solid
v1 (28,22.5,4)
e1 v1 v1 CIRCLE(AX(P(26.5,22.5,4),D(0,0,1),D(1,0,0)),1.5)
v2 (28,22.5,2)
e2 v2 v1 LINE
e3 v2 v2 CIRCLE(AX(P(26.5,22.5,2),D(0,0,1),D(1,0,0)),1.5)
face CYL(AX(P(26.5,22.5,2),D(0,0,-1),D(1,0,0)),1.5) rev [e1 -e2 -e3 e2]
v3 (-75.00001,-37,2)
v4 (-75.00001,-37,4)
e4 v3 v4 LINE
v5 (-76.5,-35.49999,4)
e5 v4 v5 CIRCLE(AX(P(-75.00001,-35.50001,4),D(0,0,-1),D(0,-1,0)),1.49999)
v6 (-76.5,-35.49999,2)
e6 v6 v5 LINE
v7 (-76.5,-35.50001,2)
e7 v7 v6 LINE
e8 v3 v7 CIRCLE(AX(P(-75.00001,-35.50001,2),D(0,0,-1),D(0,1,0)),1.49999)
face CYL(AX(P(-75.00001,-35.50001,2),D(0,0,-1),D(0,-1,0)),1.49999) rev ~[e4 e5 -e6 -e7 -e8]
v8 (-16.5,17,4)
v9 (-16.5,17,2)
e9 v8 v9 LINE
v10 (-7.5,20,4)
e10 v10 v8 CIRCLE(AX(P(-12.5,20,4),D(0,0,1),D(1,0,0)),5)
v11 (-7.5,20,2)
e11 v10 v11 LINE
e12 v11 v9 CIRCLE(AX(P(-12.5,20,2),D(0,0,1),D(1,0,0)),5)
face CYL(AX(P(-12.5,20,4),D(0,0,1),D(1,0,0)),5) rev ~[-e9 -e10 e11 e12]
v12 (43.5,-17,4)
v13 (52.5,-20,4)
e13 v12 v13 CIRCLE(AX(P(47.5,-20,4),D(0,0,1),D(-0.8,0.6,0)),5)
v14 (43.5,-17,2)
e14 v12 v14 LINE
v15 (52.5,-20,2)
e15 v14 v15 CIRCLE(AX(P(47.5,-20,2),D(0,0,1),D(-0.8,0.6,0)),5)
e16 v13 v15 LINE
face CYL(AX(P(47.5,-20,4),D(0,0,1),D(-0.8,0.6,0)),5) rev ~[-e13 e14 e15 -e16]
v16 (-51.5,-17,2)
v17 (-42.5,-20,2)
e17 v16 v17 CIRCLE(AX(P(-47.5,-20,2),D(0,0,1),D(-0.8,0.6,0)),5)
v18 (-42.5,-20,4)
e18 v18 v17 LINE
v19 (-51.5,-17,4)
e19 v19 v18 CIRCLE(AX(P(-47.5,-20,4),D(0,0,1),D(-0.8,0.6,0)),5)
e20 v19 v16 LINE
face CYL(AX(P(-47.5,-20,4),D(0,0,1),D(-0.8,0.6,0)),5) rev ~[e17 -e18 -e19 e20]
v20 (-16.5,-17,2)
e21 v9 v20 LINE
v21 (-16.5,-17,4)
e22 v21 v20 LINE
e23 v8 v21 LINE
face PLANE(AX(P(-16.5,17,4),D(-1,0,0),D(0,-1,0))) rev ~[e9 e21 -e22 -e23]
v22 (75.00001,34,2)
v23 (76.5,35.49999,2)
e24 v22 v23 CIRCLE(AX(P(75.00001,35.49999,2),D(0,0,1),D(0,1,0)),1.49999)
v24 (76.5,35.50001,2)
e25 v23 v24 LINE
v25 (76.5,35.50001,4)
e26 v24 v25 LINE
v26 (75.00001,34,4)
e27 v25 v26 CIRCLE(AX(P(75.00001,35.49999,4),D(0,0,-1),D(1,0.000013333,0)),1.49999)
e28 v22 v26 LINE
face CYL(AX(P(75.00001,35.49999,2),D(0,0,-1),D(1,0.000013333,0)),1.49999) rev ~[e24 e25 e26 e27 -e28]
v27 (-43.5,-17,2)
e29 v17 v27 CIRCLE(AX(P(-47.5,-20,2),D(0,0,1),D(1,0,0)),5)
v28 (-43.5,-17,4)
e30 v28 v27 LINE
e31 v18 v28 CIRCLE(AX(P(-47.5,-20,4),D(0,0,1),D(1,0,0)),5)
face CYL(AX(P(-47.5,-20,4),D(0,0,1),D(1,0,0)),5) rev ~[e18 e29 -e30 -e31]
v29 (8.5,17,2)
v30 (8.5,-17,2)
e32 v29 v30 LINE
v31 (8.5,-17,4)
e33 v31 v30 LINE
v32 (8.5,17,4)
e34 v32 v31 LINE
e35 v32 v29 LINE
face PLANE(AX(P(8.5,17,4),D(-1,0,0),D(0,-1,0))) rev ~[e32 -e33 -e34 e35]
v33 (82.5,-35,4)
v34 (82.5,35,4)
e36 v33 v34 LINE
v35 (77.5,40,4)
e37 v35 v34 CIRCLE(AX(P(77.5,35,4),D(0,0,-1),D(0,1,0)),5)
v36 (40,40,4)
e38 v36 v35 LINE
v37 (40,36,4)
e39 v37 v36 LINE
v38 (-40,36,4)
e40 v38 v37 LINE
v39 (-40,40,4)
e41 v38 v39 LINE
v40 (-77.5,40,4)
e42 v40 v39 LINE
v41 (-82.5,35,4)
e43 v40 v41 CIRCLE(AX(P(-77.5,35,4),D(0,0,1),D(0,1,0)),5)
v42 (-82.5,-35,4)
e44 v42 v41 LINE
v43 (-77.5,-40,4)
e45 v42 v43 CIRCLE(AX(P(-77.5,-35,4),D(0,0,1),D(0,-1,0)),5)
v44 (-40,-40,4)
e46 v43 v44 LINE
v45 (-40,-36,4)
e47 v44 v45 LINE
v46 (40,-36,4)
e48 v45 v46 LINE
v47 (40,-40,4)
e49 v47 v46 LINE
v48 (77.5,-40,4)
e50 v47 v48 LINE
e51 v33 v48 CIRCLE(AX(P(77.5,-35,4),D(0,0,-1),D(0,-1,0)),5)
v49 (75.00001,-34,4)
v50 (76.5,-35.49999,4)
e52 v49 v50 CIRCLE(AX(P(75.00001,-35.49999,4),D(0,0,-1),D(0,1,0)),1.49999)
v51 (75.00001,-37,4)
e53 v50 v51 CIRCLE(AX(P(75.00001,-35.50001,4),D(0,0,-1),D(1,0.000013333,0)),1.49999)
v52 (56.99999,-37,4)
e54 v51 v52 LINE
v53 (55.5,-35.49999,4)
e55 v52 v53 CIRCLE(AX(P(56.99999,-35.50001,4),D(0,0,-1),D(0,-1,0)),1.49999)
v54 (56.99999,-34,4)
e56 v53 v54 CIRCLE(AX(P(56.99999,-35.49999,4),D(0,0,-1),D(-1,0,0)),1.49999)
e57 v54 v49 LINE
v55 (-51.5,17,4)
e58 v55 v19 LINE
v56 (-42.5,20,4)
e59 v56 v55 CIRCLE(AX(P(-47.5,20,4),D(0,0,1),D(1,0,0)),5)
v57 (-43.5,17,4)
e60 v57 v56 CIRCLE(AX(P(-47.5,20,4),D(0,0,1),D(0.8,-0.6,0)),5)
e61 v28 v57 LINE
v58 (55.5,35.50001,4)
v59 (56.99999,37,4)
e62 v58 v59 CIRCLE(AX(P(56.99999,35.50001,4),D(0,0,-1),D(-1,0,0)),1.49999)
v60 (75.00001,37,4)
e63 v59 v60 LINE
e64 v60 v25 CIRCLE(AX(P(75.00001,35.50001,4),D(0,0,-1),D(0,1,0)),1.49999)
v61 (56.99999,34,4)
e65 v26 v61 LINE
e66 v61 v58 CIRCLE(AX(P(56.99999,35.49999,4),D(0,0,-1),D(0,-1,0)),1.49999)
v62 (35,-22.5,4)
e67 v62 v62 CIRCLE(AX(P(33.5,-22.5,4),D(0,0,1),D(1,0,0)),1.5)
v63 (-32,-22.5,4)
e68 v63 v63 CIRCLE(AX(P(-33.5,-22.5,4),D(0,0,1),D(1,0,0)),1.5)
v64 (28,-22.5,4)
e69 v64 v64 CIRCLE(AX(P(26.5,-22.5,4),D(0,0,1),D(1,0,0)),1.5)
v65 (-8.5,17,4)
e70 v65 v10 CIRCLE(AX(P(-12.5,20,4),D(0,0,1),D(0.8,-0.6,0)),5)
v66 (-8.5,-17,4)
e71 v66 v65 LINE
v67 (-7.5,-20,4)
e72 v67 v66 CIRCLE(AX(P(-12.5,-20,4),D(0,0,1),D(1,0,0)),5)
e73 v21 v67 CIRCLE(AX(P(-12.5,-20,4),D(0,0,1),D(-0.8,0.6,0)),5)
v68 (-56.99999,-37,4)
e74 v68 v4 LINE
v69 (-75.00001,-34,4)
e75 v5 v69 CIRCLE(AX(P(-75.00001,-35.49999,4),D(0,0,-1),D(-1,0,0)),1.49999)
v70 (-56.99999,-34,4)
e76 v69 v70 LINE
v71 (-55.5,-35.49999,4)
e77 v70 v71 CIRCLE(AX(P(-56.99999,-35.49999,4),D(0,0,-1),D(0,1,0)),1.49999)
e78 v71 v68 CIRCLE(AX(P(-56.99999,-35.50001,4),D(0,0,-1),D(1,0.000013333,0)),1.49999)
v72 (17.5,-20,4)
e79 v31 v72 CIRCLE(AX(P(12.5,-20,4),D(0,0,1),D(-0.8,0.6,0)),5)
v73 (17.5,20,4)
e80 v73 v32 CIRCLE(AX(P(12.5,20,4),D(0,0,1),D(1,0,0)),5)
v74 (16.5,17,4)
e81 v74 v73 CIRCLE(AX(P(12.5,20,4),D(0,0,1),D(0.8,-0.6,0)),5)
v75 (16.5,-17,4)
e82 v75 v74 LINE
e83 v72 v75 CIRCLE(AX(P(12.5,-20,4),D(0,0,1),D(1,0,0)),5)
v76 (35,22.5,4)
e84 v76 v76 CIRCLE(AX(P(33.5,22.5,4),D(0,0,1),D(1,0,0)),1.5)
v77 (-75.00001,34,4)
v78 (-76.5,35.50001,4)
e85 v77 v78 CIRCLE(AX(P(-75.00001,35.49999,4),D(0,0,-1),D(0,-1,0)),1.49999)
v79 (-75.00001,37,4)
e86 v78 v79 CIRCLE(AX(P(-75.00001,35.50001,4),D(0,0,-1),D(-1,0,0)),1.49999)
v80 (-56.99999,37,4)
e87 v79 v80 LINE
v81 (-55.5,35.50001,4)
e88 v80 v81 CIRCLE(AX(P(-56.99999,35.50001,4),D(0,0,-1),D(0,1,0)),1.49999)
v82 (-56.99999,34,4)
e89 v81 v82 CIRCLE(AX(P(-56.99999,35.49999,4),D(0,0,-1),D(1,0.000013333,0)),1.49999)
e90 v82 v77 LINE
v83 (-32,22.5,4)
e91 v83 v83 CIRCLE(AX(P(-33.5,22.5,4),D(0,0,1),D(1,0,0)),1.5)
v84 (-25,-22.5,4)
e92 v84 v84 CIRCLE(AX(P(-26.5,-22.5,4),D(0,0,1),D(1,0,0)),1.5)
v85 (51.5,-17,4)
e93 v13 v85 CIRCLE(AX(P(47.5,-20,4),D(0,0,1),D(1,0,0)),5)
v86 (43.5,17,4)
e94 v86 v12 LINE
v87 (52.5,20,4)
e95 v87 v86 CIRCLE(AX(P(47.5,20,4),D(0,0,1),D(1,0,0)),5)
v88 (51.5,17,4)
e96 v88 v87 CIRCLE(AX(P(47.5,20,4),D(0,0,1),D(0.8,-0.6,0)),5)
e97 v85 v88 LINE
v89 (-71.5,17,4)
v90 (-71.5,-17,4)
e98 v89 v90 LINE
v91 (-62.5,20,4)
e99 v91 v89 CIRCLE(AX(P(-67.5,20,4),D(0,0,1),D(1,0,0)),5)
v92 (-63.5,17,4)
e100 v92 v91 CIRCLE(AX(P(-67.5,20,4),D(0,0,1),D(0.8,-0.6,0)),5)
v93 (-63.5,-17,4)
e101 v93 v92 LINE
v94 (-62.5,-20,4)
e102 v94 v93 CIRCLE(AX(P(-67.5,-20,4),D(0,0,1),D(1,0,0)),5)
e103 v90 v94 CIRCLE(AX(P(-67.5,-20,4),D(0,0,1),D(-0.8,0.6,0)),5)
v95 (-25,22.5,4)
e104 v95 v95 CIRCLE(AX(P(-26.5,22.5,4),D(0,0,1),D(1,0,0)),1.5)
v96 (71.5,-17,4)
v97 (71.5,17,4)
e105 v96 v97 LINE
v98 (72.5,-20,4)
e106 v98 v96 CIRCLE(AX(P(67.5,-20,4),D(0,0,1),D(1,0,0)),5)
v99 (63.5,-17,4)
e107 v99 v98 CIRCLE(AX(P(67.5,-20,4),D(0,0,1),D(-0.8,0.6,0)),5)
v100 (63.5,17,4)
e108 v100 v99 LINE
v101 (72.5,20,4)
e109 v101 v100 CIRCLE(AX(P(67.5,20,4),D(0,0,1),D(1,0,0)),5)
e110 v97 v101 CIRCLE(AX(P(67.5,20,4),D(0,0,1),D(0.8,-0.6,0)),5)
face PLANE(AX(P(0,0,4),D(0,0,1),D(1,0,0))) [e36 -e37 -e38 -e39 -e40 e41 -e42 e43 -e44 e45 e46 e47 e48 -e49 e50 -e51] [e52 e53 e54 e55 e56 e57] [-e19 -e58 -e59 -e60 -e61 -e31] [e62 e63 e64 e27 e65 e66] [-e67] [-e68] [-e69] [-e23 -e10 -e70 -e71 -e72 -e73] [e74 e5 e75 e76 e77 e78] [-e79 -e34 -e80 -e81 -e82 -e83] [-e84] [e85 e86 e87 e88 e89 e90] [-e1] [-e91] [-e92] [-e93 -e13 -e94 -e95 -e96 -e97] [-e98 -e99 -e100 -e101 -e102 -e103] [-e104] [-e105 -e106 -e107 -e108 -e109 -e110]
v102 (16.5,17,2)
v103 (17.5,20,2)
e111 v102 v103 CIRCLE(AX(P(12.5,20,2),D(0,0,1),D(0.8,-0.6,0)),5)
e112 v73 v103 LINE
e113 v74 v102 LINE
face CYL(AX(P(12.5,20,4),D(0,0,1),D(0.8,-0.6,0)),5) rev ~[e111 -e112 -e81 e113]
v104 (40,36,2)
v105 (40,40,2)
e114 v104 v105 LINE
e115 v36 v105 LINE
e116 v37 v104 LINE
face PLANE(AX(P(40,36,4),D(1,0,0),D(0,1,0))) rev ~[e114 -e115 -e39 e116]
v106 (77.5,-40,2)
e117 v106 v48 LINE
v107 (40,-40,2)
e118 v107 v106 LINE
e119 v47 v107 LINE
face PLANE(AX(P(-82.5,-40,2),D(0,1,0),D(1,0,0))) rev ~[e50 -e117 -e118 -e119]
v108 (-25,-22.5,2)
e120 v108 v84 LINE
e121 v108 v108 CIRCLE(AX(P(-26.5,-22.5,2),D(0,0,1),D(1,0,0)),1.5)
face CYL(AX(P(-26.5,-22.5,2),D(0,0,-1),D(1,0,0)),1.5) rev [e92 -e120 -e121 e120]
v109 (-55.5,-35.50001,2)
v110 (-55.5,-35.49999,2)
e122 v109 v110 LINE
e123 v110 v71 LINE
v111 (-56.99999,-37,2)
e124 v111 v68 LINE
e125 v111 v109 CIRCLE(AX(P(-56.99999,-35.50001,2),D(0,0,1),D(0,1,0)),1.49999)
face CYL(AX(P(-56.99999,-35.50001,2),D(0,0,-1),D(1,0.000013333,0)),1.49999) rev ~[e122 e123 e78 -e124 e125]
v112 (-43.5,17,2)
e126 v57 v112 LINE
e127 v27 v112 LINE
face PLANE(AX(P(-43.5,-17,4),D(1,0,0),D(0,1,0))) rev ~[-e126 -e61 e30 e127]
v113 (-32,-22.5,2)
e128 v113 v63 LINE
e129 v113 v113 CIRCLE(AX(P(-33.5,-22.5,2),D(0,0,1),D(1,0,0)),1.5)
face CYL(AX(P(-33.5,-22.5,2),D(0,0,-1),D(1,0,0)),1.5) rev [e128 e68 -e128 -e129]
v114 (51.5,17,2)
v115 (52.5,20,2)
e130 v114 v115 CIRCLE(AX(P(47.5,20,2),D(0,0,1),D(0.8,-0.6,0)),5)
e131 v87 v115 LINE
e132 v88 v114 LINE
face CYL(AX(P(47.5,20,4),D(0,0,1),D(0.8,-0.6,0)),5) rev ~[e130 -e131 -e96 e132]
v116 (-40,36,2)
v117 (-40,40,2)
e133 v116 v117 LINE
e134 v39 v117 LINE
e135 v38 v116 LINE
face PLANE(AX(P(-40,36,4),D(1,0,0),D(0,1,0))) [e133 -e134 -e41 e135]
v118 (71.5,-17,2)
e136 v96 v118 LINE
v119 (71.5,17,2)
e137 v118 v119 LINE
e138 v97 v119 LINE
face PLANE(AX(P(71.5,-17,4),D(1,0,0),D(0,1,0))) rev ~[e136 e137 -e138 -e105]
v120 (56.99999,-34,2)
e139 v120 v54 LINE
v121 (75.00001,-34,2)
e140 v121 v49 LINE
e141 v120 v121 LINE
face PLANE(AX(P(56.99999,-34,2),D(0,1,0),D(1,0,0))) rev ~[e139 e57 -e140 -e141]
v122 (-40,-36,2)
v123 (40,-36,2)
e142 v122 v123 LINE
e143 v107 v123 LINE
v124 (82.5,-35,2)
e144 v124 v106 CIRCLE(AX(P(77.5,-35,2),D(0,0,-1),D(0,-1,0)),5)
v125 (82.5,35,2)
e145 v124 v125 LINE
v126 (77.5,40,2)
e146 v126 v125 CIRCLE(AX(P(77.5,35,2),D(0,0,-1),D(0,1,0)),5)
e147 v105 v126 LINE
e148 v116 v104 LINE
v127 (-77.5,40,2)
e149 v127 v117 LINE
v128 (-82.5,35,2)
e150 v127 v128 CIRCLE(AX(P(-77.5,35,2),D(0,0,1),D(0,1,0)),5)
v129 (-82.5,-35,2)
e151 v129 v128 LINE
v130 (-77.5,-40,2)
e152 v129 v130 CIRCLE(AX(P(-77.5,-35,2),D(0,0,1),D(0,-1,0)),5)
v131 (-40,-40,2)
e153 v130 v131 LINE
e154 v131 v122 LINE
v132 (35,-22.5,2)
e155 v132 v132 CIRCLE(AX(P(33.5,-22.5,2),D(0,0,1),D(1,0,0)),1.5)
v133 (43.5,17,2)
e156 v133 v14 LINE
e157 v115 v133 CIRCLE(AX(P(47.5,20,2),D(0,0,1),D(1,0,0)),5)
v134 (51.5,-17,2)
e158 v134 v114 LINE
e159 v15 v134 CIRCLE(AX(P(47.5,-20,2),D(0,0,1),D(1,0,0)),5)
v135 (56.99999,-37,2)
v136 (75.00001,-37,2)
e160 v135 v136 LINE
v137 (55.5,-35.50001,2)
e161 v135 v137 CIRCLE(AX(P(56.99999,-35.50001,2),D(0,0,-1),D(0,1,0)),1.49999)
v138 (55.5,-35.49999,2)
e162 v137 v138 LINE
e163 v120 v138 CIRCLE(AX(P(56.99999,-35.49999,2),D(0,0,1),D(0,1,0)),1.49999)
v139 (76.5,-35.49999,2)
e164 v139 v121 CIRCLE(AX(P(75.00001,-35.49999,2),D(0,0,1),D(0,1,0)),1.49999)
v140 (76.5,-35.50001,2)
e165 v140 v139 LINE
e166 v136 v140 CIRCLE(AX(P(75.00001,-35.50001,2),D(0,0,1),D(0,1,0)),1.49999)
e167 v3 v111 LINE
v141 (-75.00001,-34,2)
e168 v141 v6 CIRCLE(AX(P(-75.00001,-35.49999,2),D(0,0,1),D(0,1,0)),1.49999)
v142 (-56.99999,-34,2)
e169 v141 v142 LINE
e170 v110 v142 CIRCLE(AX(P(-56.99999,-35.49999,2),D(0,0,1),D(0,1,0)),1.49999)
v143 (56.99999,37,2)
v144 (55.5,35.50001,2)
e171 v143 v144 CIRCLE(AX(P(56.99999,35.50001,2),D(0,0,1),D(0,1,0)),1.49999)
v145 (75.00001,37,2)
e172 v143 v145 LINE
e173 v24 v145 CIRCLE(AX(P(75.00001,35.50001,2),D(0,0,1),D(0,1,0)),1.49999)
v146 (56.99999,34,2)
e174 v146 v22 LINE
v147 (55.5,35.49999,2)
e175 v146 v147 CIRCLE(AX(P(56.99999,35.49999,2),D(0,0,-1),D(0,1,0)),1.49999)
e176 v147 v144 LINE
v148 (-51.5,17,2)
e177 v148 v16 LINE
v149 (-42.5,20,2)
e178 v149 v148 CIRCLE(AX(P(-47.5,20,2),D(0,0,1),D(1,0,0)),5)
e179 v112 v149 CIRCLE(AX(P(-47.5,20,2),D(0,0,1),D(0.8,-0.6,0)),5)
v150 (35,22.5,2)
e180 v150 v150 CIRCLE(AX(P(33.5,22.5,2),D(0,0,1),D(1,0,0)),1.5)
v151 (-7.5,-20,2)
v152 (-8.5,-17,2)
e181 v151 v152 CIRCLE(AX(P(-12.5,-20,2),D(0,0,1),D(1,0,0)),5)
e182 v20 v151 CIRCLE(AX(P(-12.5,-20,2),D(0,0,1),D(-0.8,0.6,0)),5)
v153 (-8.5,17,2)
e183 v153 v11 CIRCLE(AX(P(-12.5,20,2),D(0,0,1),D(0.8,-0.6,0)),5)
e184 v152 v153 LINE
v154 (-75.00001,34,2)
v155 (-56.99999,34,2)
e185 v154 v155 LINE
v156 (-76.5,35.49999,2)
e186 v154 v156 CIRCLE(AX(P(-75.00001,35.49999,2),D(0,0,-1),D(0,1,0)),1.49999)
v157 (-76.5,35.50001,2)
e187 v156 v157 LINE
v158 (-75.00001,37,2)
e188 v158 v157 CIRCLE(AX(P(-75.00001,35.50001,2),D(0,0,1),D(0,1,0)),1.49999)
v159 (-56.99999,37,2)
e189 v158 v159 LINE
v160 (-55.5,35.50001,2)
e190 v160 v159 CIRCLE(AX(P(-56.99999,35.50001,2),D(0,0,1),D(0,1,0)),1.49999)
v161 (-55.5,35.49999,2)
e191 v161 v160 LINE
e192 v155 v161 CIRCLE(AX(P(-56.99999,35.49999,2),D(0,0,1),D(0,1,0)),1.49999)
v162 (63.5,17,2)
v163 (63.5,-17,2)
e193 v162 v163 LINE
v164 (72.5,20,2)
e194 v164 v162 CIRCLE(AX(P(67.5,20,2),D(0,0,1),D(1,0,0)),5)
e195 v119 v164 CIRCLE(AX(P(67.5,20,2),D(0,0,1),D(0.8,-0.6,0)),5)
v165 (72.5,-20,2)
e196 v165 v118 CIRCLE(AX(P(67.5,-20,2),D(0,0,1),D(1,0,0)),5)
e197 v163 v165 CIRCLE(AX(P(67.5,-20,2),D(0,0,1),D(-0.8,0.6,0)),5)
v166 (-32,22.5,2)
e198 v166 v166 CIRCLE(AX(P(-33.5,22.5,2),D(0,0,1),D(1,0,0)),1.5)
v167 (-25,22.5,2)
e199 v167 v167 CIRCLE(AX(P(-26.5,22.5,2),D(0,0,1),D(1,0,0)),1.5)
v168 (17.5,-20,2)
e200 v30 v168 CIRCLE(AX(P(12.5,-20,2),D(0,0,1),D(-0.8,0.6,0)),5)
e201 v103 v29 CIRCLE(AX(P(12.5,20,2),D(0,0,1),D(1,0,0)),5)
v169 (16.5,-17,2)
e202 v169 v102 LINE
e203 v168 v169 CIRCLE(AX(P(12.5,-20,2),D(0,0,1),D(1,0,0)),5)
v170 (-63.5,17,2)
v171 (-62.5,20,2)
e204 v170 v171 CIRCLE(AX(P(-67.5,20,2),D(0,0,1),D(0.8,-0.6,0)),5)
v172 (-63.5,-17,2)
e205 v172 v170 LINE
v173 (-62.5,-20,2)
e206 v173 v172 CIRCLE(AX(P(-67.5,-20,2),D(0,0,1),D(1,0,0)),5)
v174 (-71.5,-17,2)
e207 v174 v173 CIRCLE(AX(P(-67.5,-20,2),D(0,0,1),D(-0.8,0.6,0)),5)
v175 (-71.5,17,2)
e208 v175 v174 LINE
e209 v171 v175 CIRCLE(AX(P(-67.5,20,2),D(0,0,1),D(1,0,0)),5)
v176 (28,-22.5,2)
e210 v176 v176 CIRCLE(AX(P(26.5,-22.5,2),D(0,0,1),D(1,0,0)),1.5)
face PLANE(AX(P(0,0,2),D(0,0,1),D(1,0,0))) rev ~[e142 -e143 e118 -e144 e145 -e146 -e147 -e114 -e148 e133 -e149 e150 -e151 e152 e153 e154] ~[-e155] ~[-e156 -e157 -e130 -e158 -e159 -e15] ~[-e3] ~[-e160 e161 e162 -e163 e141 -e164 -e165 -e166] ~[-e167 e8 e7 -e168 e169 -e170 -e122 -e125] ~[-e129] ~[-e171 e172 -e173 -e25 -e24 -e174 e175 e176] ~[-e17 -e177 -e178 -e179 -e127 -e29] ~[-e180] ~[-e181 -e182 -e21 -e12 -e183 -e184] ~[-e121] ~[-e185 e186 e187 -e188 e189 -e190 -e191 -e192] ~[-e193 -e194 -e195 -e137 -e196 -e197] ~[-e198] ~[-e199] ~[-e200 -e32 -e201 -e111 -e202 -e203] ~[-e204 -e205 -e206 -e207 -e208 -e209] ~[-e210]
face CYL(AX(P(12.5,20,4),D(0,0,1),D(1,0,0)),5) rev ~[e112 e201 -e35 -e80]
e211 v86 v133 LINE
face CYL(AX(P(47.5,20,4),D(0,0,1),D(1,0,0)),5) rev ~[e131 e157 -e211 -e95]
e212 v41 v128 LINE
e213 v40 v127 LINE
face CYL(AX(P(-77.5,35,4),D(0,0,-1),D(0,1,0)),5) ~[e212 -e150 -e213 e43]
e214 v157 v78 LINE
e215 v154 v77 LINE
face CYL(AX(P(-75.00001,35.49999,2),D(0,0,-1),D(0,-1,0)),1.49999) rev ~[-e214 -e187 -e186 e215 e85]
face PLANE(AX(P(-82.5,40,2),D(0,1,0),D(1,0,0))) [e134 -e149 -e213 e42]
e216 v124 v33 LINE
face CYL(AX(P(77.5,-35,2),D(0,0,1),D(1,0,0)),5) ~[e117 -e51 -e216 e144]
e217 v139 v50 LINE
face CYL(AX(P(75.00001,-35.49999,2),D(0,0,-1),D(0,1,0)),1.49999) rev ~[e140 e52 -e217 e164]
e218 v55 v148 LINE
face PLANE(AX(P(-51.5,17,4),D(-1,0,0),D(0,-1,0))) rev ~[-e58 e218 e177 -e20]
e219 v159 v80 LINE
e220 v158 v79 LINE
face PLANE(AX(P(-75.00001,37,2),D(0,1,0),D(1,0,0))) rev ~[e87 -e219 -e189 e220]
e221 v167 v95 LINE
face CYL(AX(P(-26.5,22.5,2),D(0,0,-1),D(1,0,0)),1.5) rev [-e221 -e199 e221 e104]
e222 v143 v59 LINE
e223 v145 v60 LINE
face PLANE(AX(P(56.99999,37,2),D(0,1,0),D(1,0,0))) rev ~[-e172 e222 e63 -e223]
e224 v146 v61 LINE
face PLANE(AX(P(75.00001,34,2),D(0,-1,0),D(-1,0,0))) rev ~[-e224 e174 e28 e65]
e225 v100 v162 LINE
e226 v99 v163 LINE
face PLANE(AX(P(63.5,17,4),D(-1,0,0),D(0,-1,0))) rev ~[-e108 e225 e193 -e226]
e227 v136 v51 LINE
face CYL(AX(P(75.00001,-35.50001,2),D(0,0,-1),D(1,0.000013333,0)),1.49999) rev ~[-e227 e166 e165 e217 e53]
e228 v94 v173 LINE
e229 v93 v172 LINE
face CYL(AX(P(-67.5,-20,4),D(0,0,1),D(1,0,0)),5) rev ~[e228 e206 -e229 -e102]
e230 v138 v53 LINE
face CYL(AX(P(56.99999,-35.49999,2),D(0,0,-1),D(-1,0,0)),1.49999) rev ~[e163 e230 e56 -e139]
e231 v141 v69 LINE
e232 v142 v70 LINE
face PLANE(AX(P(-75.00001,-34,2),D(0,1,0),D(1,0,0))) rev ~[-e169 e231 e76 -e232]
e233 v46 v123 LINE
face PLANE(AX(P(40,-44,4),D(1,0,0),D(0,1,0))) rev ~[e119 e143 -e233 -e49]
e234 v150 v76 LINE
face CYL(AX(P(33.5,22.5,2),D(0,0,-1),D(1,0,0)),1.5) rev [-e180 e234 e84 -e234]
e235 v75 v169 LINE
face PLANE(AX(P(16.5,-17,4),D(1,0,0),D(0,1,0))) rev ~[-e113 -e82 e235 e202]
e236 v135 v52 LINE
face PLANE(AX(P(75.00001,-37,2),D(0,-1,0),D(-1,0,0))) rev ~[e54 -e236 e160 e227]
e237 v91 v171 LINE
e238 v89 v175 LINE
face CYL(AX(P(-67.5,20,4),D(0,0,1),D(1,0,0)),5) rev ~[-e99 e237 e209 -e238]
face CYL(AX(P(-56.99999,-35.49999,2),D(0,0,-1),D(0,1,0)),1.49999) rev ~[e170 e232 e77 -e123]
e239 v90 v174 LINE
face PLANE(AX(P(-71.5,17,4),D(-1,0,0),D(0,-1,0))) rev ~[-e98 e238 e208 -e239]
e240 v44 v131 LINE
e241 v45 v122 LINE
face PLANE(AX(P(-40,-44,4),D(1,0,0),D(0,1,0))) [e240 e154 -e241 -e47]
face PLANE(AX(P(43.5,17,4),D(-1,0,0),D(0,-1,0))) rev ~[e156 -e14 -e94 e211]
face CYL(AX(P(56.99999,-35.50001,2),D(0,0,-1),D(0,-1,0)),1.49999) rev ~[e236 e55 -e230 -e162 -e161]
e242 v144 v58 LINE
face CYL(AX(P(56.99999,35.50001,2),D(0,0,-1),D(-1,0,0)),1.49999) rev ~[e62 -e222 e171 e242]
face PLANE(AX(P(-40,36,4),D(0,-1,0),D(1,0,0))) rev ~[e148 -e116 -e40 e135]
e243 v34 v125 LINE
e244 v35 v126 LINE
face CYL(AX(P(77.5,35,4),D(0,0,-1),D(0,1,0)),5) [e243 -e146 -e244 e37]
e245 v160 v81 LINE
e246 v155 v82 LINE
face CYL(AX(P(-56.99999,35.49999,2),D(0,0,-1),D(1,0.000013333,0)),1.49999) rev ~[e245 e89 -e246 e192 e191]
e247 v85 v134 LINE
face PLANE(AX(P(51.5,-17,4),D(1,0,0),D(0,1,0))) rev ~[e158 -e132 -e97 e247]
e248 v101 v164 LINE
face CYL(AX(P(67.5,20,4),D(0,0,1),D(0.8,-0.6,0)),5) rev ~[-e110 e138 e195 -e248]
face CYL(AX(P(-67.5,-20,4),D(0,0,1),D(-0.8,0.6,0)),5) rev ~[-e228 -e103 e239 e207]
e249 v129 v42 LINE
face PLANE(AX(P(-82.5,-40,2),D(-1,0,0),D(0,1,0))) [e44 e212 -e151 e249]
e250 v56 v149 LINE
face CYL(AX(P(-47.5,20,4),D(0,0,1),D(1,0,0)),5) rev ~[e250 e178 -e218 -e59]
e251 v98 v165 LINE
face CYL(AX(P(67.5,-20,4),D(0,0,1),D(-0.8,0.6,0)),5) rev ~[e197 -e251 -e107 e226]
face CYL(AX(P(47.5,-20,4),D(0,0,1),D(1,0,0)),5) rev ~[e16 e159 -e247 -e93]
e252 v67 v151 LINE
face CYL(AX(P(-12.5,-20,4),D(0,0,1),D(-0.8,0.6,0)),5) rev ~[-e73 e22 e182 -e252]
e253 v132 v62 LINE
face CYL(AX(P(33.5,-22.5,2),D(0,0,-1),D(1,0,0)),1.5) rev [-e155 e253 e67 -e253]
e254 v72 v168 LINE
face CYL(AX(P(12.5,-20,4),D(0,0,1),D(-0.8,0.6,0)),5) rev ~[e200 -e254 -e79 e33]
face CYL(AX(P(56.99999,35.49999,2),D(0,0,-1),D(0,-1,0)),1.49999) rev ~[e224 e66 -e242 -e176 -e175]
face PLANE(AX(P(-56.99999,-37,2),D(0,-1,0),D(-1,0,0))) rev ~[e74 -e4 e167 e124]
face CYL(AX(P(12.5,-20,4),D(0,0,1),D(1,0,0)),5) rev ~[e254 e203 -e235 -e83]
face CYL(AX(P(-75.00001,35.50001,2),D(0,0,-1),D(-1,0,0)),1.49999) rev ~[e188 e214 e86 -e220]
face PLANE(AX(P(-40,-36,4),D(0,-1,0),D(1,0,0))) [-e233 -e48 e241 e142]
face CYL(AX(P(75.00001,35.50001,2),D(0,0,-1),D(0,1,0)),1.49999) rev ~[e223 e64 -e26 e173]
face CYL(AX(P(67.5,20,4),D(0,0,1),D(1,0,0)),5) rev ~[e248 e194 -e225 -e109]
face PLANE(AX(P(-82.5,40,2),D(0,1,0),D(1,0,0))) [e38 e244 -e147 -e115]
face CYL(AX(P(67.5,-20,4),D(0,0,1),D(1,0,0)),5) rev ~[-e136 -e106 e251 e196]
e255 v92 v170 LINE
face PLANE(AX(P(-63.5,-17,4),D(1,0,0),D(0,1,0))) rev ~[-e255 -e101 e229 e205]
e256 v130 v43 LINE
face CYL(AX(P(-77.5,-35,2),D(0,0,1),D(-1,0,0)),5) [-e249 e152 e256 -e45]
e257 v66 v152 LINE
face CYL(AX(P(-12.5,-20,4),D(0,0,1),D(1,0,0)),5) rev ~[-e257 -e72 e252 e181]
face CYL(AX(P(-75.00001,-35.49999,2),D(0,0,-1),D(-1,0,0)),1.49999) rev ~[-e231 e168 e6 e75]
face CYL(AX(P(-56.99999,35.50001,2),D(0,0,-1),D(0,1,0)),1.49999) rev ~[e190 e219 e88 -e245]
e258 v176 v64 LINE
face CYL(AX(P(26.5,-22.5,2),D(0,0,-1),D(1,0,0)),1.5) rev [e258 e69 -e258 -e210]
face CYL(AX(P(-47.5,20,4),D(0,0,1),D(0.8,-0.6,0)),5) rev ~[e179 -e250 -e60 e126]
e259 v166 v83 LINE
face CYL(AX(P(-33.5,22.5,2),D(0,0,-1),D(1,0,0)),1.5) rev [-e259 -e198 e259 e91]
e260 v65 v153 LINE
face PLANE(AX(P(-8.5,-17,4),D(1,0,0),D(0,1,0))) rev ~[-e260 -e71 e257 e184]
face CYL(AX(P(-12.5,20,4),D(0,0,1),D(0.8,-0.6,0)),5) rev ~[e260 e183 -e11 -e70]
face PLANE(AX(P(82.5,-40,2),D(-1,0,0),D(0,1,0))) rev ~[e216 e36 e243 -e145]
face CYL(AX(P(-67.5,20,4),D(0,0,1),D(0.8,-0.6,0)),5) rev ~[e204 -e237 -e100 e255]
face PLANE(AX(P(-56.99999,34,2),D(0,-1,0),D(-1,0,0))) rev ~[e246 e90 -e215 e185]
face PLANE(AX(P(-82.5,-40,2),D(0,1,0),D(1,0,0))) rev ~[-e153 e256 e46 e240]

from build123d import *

# Parameters (mm, degrees)
F0_W      = 165
F0_H      = 80
F1_DEPTH  = 2
F2_W      = 21
F2_H      = 3
F3_DEPTH  = 2
F4_R      = 1.49999
F5_W      = 165
F5_H      = 80
F5_R      = 1.5
F6_DEPTH  = 2
F7_DEPTH  = 2
F8_R      = 5
F9_R      = 5
F11_DEPTH = 2.001
F12_W     = 80
F12_H     = 8
F13_DEPTH = 2.001


# Not quite as in the source:
# - a fillet or chamfer is up to 0.001 mm smaller than in the source, because OpenCascade refuses the exact size
# - ends of sketch curves that miss each other by under 0.0002 mm in the source are joined


with BuildPart() as f1:
    # F0 (on Top) → F1 (new body)
    with BuildSketch(Plane.XY):
        Rectangle(F0_W, F0_H)
    extrude(amount=F1_DEPTH)

    # F2 (on face) → F3 (cut)
    with BuildSketch(Plane.XY.offset(2)):
        with Locations((-66, 35.5)):
            Rectangle(F2_W, F2_H)
        with Locations((66, 35.5)):
            Rectangle(F2_W, F2_H)
        with Locations((66, -35.5)):
            Rectangle(F2_W, F2_H)
        with Locations((-66, -35.5)):
            Rectangle(F2_W, F2_H)
    extrude(amount=-F3_DEPTH, mode=Mode.SUBTRACT)

    # F4 (radius 1.5 in the source; OpenCascade refuses exactly that, so slightly less here)
    f4_edges = [f1.edges().sort_by_distance(p)[0] for p in [
        (76.5, -37, 1),
        (-55.5, 34, 1),
        (-55.5, -37, 1),
        (76.5, 34, 1),
        (55.5, 37, 1),
        (55.5, -34, 1),
        (-76.5, -34, 1),
        (-76.5, 37, 1),
        (-76.5, 34, 1),
        (-55.5, 37, 1),
        (76.5, 37, 1),
        (55.5, 34, 1),
        (76.5, -34, 1),
        (55.5, -37, 1),
        (-76.5, -37, 1),
        (-55.5, -34, 1),
    ]]
    fillet(f4_edges, radius=F4_R)

    # F5 (on face) → F6 (join)
    with BuildSketch(Plane.XY.offset(2)):
        Rectangle(F5_W, F5_H)
        with BuildLine():
            ThreePointArc((-76.5, -35.49999), (-76.0606631007, -34.4393368993), (-75.00001, -34))
            Line((-75.00001, -34), (-56.99999, -34))
            ThreePointArc((-56.99999, -34), (-55.9393368993, -34.4393368993), (-55.5, -35.49999))
            ThreePointArc((-55.5, -35.49999), (-55.9393368993, -36.5606631007), (-56.99999, -37))
            Line((-56.99999, -37), (-75.00001, -37))
            ThreePointArc((-75.00001, -37), (-76.0606631007, -36.5606631007), (-76.5, -35.49999))
        make_face(mode=Mode.SUBTRACT)
        with Locations((-33.5, -22.5)):
            Circle(F5_R, mode=Mode.SUBTRACT)
        with Locations((-26.5, -22.5)):
            Circle(F5_R, mode=Mode.SUBTRACT)
        with Locations((26.5, -22.5)):
            Circle(F5_R, mode=Mode.SUBTRACT)
        with Locations((33.5, -22.5)):
            Circle(F5_R, mode=Mode.SUBTRACT)
        with BuildLine():
            ThreePointArc((55.5, -35.49999), (55.9393368993, -34.4393368993), (56.99999, -34))
            Line((56.99999, -34), (75.00001, -34))
            ThreePointArc((75.00001, -34), (76.0606631007, -34.4393368993), (76.5, -35.49999))
            ThreePointArc((76.5, -35.49999), (76.0606631007, -36.5606631007), (75.00001, -37))
            Line((75.00001, -37), (56.99999, -37))
            ThreePointArc((56.99999, -37), (55.9393368993, -36.5606631007), (55.5, -35.49999))
        make_face(mode=Mode.SUBTRACT)
        with BuildLine():
            ThreePointArc((-76.5, 35.50001), (-76.0606631007, 36.5606631007), (-75.00001, 37))
            Line((-75.00001, 37), (-56.99999, 37))
            ThreePointArc((-56.99999, 37), (-55.9393368993, 36.5606631007), (-55.5, 35.50001))
            ThreePointArc((-55.5, 35.50001), (-55.9393368993, 34.4393368993), (-56.99999, 34))
            Line((-56.99999, 34), (-75.00001, 34))
            ThreePointArc((-75.00001, 34), (-76.0606631007, 34.4393368993), (-76.5, 35.50001))
        make_face(mode=Mode.SUBTRACT)
        with Locations((-33.5, 22.5)):
            Circle(F5_R, mode=Mode.SUBTRACT)
        with Locations((-26.5, 22.5)):
            Circle(F5_R, mode=Mode.SUBTRACT)
        with Locations((26.5, 22.5)):
            Circle(F5_R, mode=Mode.SUBTRACT)
        with Locations((33.5, 22.5)):
            Circle(F5_R, mode=Mode.SUBTRACT)
        with BuildLine():
            ThreePointArc((55.5, 35.50001), (55.9393368993, 36.5606631007), (56.99999, 37))
            Line((56.99999, 37), (75.00001, 37))
            ThreePointArc((75.00001, 37), (76.0606631007, 36.5606631007), (76.5, 35.50001))
            ThreePointArc((76.5, 35.50001), (76.0606631007, 34.4393368993), (75.00001, 34))
            Line((75.00001, 34), (56.99999, 34))
            ThreePointArc((56.99999, 34), (55.9393368993, 34.4393368993), (55.5, 35.50001))
        make_face(mode=Mode.SUBTRACT)
    extrude(amount=F6_DEPTH)

    # F7 (cut): a face of the model
    f7_faces = [f1.faces().sort_by_distance(p)[0] for p in [
        (0, 0, 0),
    ]]
    extrude(f7_faces, amount=-F7_DEPTH, mode=Mode.SUBTRACT)

    # F8
    f8_edges = [f1.edges().sort_by_distance(p)[0] for p in [
        (82.5, 40, 3),
    ]]
    fillet(f8_edges, radius=F8_R)

    # F9
    f9_edges = [f1.edges().sort_by_distance(p)[0] for p in [
        (82.5, -40, 3),
        (-82.5, -40, 3),
        (-82.5, 40, 3),
    ]]
    fillet(f9_edges, radius=F9_R)

    # F10 (on face) → F11 (cut, through all)
    with BuildSketch(Plane.XY.offset(4)):
        with BuildLine():
            ThreePointArc((-63.5, 17), (-67.5, 15), (-71.5, 17))
            Line((-71.5, 17), (-71.5, -6.31e-08))
            ThreePointArc((-71.5, -6.31e-08), (-67.5000000315, 4), (-63.5, 0))
            Line((-63.5, 0), (-63.5, 17))
        make_face()
        with BuildLine():
            ThreePointArc((-63.5, 0), (-67.4999999685, -4), (-71.5, -6.31e-08))
            Line((-71.5, -6.31e-08), (-71.5, -17))
            ThreePointArc((-71.5, -17), (-67.5, -15), (-63.5, -17))
            Line((-63.5, -17), (-63.5, 0))
        make_face()
        with BuildLine():
            Line((-71.5, -20), (-71.5, -17))
            ThreePointArc((-71.5, -17), (-69.0811388301, -24.7434164903), (-62.5, -20))
            ThreePointArc((-62.5, -20), (-62.7565835097, -18.4188611699), (-63.5, -17))
            Line((-63.5, -17), (-63.5, -20))
            Line((-63.5, -20), (-71.5, -20))
        make_face()
        with BuildLine():
            ThreePointArc((-63.5, -17), (-67.5, -15), (-71.5, -17))
            Line((-71.5, -17), (-71.5, -20))
            Line((-71.5, -20), (-63.5, -20))
            Line((-63.5, -20), (-63.5, -17))
        make_face()
        with BuildLine():
            ThreePointArc((-63.5, 0), (-67.5000000315, 4), (-71.5, -6.31e-08))
            ThreePointArc((-71.5, -6.31e-08), (-67.4999999685, -4), (-63.5, 0))
        make_face()
        with BuildLine():
            Line((-71.5, 20), (-71.5, 17))
            ThreePointArc((-71.5, 17), (-67.5, 15), (-63.5, 17))
            Line((-63.5, 17), (-63.5, 20))
            Line((-63.5, 20), (-71.5, 20))
        make_face()
        with BuildLine():
            ThreePointArc((-63.5, 17), (-62.7565835097, 18.4188611699), (-62.5, 20))
            ThreePointArc((-62.5, 20), (-69.0811388301, 24.7434164903), (-71.5, 17))
            Line((-71.5, 17), (-71.5, 20))
            Line((-71.5, 20), (-63.5, 20))
            Line((-63.5, 20), (-63.5, 17))
        make_face()
        with BuildLine():
            ThreePointArc((-43.5, 17), (-42.7565835097, 18.4188611699), (-42.5, 20))
            ThreePointArc((-42.5, 20), (-49.0811388301, 24.7434164903), (-51.5, 17))
            Line((-51.5, 17), (-51.5, 20))
            Line((-51.5, 20), (-43.5, 20))
            Line((-43.5, 20), (-43.5, 17))
        make_face()
        with BuildLine():
            Line((-51.5, 20), (-51.5, 17))
            ThreePointArc((-51.5, 17), (-47.5, 15), (-43.5, 17))
            Line((-43.5, 17), (-43.5, 20))
            Line((-43.5, 20), (-51.5, 20))
        make_face()
        with BuildLine():
            ThreePointArc((-43.5, 17), (-47.5, 15), (-51.5, 17))
            Line((-51.5, 17), (-51.5, -2.04e-08))
            ThreePointArc((-51.5, -2.04e-08), (-47.5000000102, 4), (-43.5, 0))
            Line((-43.5, 0), (-43.5, 17))
        make_face()
        with BuildLine():
            ThreePointArc((-43.5, 0), (-47.5000000102, 4), (-51.5, -2.04e-08))
            ThreePointArc((-51.5, -2.04e-08), (-47.4999999898, -4), (-43.5, 0))
        make_face()
        with BuildLine():
            ThreePointArc((-43.5, 0), (-47.4999999898, -4), (-51.5, -2.04e-08))
            Line((-51.5, -2.04e-08), (-51.5, -17))
            ThreePointArc((-51.5, -17), (-47.5, -15), (-43.5, -17))
            Line((-43.5, -17), (-43.5, 0))
        make_face()
        with BuildLine():
            ThreePointArc((-43.5, -17), (-47.5, -15), (-51.5, -17))
            Line((-51.5, -17), (-51.5, -20))
            Line((-51.5, -20), (-43.5, -20))
            Line((-43.5, -20), (-43.5, -17))
        make_face()
        with BuildLine():
            Line((-51.5, -20), (-51.5, -17))
            ThreePointArc((-51.5, -17), (-49.0811388301, -24.7434164903), (-42.5, -20))
            ThreePointArc((-42.5, -20), (-42.7565835097, -18.4188611699), (-43.5, -17))
            Line((-43.5, -17), (-43.5, -20))
            Line((-43.5, -20), (-51.5, -20))
        make_face()
        with BuildLine():
            ThreePointArc((-8.5, 17), (-7.7565835097, 18.4188611699), (-7.5, 20))
            ThreePointArc((-7.5, 20), (-14.0811388301, 24.7434164903), (-16.5, 17))
            Line((-16.5, 17), (-16.5, 20))
            Line((-16.5, 20), (-8.5, 20))
            Line((-8.5, 20), (-8.5, 17))
        make_face()
        with BuildLine():
            Line((-16.5, 20), (-16.5, 17))
            ThreePointArc((-16.5, 17), (-12.5, 15), (-8.5, 17))
            Line((-8.5, 17), (-8.5, 20))
            Line((-8.5, 20), (-16.5, 20))
        make_face()
        with BuildLine():
            ThreePointArc((-8.5, 17), (-12.5, 15), (-16.5, 17))
            Line((-16.5, 17), (-16.5, 8.4e-09))
            ThreePointArc((-16.5, 8.4e-09), (-12.4999999958, 4), (-8.5, 0))
            Line((-8.5, 0), (-8.5, 17))
        make_face()
        with BuildLine():
            ThreePointArc((-8.5, 0), (-12.4999999958, 4), (-16.5, 8.4e-09))
            ThreePointArc((-16.5, 8.4e-09), (-12.5000000042, -4), (-8.5, 0))
        make_face()
        with BuildLine():
            ThreePointArc((-8.5, 0), (-12.5000000042, -4), (-16.5, 8.4e-09))
            Line((-16.5, 8.4e-09), (-16.5, -17))
            ThreePointArc((-16.5, -17), (-12.5, -15), (-8.5, -17))
            Line((-8.5, -17), (-8.5, 0))
        make_face()
        with BuildLine():
            ThreePointArc((-8.5, -17), (-12.5, -15), (-16.5, -17))
            Line((-16.5, -17), (-16.5, -20))
            Line((-16.5, -20), (-8.5, -20))
            Line((-8.5, -20), (-8.5, -17))
        make_face()
        with BuildLine():
            Line((-16.5, -20), (-16.5, -17))
            ThreePointArc((-16.5, -17), (-14.0811388301, -24.7434164903), (-7.5, -20))
            ThreePointArc((-7.5, -20), (-7.7565835097, -18.4188611699), (-8.5, -17))
            Line((-8.5, -17), (-8.5, -20))
            Line((-8.5, -20), (-16.5, -20))
        make_face()
        with BuildLine():
            ThreePointArc((16.5, 17), (17.2434164903, 18.4188611699), (17.5, 20))
            ThreePointArc((17.5, 20), (10.9188611699, 24.7434164903), (8.5, 17))
            Line((8.5, 17), (8.5, 20))
            Line((8.5, 20), (16.5, 20))
            Line((16.5, 20), (16.5, 17))
        make_face()
        with BuildLine():
            Line((8.5, 20), (8.5, 17))
            ThreePointArc((8.5, 17), (12.5, 15), (16.5, 17))
            Line((16.5, 17), (16.5, 20))
            Line((16.5, 20), (8.5, 20))
        make_face()
        with BuildLine():
            ThreePointArc((16.5, 17), (12.5, 15), (8.5, 17))
            Line((8.5, 17), (8.5, 8.4e-09))
            ThreePointArc((8.5, 8.4e-09), (12.5000000042, 4), (16.5, 0))
            Line((16.5, 0), (16.5, 17))
        make_face()
        with BuildLine():
            ThreePointArc((16.5, 0), (12.5000000042, 4), (8.5, 8.4e-09))
            ThreePointArc((8.5, 8.4e-09), (12.4999999958, -4), (16.5, 0))
        make_face()
        with BuildLine():
            ThreePointArc((16.5, 0), (12.4999999958, -4), (8.5, 8.4e-09))
            Line((8.5, 8.4e-09), (8.5, -17))
            ThreePointArc((8.5, -17), (12.5, -15), (16.5, -17))
            Line((16.5, -17), (16.5, 0))
        make_face()
        with BuildLine():
            ThreePointArc((16.5, -17), (12.5, -15), (8.5, -17))
            Line((8.5, -17), (8.5, -20))
            Line((8.5, -20), (16.5, -20))
            Line((16.5, -20), (16.5, -17))
        make_face()
        with BuildLine():
            Line((8.5, -20), (8.5, -17))
            ThreePointArc((8.5, -17), (10.9188611699, -24.7434164903), (17.5, -20))
            ThreePointArc((17.5, -20), (17.2434164903, -18.4188611699), (16.5, -17))
            Line((16.5, -17), (16.5, -20))
            Line((16.5, -20), (8.5, -20))
        make_face()
        with BuildLine():
            ThreePointArc((51.5, 17), (52.2434164903, 18.4188611699), (52.5, 20))
            ThreePointArc((52.5, 20), (45.9188611699, 24.7434164903), (43.5, 17))
            Line((43.5, 17), (43.5, 20))
            Line((43.5, 20), (51.5, 20))
            Line((51.5, 20), (51.5, 17))
        make_face()
        with BuildLine():
            Line((43.5, 20), (43.5, 17))
            ThreePointArc((43.5, 17), (47.5, 15), (51.5, 17))
            Line((51.5, 17), (51.5, 20))
            Line((51.5, 20), (43.5, 20))
        make_face()
        with BuildLine():
            ThreePointArc((51.5, 17), (47.5, 15), (43.5, 17))
            Line((43.5, 17), (43.5, -2.04e-08))
            ThreePointArc((43.5, -2.04e-08), (47.4999999898, 4), (51.5, 0))
            Line((51.5, 0), (51.5, 17))
        make_face()
        with BuildLine():
            ThreePointArc((51.5, 0), (47.4999999898, 4), (43.5, -2.04e-08))
            ThreePointArc((43.5, -2.04e-08), (47.5000000102, -4), (51.5, 0))
        make_face()
        with BuildLine():
            ThreePointArc((51.5, 0), (47.5000000102, -4), (43.5, -2.04e-08))
            Line((43.5, -2.04e-08), (43.5, -17))
            ThreePointArc((43.5, -17), (47.5, -15), (51.5, -17))
            Line((51.5, -17), (51.5, 0))
        make_face()
        with BuildLine():
            ThreePointArc((51.5, -17), (47.5, -15), (43.5, -17))
            Line((43.5, -17), (43.5, -20))
            Line((43.5, -20), (51.5, -20))
            Line((51.5, -20), (51.5, -17))
        make_face()
        with BuildLine():
            Line((43.5, -20), (43.5, -17))
            ThreePointArc((43.5, -17), (45.9188611699, -24.7434164903), (52.5, -20))
            ThreePointArc((52.5, -20), (52.2434164903, -18.4188611699), (51.5, -17))
            Line((51.5, -17), (51.5, -20))
            Line((51.5, -20), (43.5, -20))
        make_face()
        with BuildLine():
            ThreePointArc((71.5, 17), (72.2434164903, 18.4188611699), (72.5, 20))
            ThreePointArc((72.5, 20), (65.9188611699, 24.7434164903), (63.5, 17))
            Line((63.5, 17), (63.5, 20))
            Line((63.5, 20), (71.5, 20))
            Line((71.5, 20), (71.5, 17))
        make_face()
        with BuildLine():
            Line((63.5, 20), (63.5, 17))
            ThreePointArc((63.5, 17), (67.5, 15), (71.5, 17))
            Line((71.5, 17), (71.5, 20))
            Line((71.5, 20), (63.5, 20))
        make_face()
        with BuildLine():
            ThreePointArc((71.5, 17), (67.5, 15), (63.5, 17))
            Line((63.5, 17), (63.5, -2.04e-08))
            ThreePointArc((63.5, -2.04e-08), (67.4999999898, 4), (71.5, 0))
            Line((71.5, 0), (71.5, 17))
        make_face()
        with BuildLine():
            ThreePointArc((71.5, 0), (67.4999999898, 4), (63.5, -2.04e-08))
            ThreePointArc((63.5, -2.04e-08), (67.5000000102, -4), (71.5, 0))
        make_face()
        with BuildLine():
            ThreePointArc((71.5, 0), (67.5000000102, -4), (63.5, -2.04e-08))
            Line((63.5, -2.04e-08), (63.5, -17))
            ThreePointArc((63.5, -17), (67.5, -15), (71.5, -17))
            Line((71.5, -17), (71.5, 0))
        make_face()
        with BuildLine():
            ThreePointArc((71.5, -17), (67.5, -15), (63.5, -17))
            Line((63.5, -17), (63.5, -20))
            Line((63.5, -20), (71.5, -20))
            Line((71.5, -20), (71.5, -17))
        make_face()
        with BuildLine():
            Line((63.5, -20), (63.5, -17))
            ThreePointArc((63.5, -17), (65.9188611699, -24.7434164903), (72.5, -20))
            ThreePointArc((72.5, -20), (72.2434164903, -18.4188611699), (71.5, -17))
            Line((71.5, -17), (71.5, -20))
            Line((71.5, -20), (63.5, -20))
        make_face()
    extrude(amount=-F11_DEPTH, mode=Mode.SUBTRACT)

    # F12 (on face) → F13 (cut, through all)
    with BuildSketch(Plane.XY.offset(4)):
        with Locations((0, -40)):
            Rectangle(F12_W, F12_H)
        with Locations((0, 40)):
            Rectangle(F12_W, F12_H)
    extrude(amount=-F13_DEPTH, mode=Mode.SUBTRACT)


solid = f1.part
